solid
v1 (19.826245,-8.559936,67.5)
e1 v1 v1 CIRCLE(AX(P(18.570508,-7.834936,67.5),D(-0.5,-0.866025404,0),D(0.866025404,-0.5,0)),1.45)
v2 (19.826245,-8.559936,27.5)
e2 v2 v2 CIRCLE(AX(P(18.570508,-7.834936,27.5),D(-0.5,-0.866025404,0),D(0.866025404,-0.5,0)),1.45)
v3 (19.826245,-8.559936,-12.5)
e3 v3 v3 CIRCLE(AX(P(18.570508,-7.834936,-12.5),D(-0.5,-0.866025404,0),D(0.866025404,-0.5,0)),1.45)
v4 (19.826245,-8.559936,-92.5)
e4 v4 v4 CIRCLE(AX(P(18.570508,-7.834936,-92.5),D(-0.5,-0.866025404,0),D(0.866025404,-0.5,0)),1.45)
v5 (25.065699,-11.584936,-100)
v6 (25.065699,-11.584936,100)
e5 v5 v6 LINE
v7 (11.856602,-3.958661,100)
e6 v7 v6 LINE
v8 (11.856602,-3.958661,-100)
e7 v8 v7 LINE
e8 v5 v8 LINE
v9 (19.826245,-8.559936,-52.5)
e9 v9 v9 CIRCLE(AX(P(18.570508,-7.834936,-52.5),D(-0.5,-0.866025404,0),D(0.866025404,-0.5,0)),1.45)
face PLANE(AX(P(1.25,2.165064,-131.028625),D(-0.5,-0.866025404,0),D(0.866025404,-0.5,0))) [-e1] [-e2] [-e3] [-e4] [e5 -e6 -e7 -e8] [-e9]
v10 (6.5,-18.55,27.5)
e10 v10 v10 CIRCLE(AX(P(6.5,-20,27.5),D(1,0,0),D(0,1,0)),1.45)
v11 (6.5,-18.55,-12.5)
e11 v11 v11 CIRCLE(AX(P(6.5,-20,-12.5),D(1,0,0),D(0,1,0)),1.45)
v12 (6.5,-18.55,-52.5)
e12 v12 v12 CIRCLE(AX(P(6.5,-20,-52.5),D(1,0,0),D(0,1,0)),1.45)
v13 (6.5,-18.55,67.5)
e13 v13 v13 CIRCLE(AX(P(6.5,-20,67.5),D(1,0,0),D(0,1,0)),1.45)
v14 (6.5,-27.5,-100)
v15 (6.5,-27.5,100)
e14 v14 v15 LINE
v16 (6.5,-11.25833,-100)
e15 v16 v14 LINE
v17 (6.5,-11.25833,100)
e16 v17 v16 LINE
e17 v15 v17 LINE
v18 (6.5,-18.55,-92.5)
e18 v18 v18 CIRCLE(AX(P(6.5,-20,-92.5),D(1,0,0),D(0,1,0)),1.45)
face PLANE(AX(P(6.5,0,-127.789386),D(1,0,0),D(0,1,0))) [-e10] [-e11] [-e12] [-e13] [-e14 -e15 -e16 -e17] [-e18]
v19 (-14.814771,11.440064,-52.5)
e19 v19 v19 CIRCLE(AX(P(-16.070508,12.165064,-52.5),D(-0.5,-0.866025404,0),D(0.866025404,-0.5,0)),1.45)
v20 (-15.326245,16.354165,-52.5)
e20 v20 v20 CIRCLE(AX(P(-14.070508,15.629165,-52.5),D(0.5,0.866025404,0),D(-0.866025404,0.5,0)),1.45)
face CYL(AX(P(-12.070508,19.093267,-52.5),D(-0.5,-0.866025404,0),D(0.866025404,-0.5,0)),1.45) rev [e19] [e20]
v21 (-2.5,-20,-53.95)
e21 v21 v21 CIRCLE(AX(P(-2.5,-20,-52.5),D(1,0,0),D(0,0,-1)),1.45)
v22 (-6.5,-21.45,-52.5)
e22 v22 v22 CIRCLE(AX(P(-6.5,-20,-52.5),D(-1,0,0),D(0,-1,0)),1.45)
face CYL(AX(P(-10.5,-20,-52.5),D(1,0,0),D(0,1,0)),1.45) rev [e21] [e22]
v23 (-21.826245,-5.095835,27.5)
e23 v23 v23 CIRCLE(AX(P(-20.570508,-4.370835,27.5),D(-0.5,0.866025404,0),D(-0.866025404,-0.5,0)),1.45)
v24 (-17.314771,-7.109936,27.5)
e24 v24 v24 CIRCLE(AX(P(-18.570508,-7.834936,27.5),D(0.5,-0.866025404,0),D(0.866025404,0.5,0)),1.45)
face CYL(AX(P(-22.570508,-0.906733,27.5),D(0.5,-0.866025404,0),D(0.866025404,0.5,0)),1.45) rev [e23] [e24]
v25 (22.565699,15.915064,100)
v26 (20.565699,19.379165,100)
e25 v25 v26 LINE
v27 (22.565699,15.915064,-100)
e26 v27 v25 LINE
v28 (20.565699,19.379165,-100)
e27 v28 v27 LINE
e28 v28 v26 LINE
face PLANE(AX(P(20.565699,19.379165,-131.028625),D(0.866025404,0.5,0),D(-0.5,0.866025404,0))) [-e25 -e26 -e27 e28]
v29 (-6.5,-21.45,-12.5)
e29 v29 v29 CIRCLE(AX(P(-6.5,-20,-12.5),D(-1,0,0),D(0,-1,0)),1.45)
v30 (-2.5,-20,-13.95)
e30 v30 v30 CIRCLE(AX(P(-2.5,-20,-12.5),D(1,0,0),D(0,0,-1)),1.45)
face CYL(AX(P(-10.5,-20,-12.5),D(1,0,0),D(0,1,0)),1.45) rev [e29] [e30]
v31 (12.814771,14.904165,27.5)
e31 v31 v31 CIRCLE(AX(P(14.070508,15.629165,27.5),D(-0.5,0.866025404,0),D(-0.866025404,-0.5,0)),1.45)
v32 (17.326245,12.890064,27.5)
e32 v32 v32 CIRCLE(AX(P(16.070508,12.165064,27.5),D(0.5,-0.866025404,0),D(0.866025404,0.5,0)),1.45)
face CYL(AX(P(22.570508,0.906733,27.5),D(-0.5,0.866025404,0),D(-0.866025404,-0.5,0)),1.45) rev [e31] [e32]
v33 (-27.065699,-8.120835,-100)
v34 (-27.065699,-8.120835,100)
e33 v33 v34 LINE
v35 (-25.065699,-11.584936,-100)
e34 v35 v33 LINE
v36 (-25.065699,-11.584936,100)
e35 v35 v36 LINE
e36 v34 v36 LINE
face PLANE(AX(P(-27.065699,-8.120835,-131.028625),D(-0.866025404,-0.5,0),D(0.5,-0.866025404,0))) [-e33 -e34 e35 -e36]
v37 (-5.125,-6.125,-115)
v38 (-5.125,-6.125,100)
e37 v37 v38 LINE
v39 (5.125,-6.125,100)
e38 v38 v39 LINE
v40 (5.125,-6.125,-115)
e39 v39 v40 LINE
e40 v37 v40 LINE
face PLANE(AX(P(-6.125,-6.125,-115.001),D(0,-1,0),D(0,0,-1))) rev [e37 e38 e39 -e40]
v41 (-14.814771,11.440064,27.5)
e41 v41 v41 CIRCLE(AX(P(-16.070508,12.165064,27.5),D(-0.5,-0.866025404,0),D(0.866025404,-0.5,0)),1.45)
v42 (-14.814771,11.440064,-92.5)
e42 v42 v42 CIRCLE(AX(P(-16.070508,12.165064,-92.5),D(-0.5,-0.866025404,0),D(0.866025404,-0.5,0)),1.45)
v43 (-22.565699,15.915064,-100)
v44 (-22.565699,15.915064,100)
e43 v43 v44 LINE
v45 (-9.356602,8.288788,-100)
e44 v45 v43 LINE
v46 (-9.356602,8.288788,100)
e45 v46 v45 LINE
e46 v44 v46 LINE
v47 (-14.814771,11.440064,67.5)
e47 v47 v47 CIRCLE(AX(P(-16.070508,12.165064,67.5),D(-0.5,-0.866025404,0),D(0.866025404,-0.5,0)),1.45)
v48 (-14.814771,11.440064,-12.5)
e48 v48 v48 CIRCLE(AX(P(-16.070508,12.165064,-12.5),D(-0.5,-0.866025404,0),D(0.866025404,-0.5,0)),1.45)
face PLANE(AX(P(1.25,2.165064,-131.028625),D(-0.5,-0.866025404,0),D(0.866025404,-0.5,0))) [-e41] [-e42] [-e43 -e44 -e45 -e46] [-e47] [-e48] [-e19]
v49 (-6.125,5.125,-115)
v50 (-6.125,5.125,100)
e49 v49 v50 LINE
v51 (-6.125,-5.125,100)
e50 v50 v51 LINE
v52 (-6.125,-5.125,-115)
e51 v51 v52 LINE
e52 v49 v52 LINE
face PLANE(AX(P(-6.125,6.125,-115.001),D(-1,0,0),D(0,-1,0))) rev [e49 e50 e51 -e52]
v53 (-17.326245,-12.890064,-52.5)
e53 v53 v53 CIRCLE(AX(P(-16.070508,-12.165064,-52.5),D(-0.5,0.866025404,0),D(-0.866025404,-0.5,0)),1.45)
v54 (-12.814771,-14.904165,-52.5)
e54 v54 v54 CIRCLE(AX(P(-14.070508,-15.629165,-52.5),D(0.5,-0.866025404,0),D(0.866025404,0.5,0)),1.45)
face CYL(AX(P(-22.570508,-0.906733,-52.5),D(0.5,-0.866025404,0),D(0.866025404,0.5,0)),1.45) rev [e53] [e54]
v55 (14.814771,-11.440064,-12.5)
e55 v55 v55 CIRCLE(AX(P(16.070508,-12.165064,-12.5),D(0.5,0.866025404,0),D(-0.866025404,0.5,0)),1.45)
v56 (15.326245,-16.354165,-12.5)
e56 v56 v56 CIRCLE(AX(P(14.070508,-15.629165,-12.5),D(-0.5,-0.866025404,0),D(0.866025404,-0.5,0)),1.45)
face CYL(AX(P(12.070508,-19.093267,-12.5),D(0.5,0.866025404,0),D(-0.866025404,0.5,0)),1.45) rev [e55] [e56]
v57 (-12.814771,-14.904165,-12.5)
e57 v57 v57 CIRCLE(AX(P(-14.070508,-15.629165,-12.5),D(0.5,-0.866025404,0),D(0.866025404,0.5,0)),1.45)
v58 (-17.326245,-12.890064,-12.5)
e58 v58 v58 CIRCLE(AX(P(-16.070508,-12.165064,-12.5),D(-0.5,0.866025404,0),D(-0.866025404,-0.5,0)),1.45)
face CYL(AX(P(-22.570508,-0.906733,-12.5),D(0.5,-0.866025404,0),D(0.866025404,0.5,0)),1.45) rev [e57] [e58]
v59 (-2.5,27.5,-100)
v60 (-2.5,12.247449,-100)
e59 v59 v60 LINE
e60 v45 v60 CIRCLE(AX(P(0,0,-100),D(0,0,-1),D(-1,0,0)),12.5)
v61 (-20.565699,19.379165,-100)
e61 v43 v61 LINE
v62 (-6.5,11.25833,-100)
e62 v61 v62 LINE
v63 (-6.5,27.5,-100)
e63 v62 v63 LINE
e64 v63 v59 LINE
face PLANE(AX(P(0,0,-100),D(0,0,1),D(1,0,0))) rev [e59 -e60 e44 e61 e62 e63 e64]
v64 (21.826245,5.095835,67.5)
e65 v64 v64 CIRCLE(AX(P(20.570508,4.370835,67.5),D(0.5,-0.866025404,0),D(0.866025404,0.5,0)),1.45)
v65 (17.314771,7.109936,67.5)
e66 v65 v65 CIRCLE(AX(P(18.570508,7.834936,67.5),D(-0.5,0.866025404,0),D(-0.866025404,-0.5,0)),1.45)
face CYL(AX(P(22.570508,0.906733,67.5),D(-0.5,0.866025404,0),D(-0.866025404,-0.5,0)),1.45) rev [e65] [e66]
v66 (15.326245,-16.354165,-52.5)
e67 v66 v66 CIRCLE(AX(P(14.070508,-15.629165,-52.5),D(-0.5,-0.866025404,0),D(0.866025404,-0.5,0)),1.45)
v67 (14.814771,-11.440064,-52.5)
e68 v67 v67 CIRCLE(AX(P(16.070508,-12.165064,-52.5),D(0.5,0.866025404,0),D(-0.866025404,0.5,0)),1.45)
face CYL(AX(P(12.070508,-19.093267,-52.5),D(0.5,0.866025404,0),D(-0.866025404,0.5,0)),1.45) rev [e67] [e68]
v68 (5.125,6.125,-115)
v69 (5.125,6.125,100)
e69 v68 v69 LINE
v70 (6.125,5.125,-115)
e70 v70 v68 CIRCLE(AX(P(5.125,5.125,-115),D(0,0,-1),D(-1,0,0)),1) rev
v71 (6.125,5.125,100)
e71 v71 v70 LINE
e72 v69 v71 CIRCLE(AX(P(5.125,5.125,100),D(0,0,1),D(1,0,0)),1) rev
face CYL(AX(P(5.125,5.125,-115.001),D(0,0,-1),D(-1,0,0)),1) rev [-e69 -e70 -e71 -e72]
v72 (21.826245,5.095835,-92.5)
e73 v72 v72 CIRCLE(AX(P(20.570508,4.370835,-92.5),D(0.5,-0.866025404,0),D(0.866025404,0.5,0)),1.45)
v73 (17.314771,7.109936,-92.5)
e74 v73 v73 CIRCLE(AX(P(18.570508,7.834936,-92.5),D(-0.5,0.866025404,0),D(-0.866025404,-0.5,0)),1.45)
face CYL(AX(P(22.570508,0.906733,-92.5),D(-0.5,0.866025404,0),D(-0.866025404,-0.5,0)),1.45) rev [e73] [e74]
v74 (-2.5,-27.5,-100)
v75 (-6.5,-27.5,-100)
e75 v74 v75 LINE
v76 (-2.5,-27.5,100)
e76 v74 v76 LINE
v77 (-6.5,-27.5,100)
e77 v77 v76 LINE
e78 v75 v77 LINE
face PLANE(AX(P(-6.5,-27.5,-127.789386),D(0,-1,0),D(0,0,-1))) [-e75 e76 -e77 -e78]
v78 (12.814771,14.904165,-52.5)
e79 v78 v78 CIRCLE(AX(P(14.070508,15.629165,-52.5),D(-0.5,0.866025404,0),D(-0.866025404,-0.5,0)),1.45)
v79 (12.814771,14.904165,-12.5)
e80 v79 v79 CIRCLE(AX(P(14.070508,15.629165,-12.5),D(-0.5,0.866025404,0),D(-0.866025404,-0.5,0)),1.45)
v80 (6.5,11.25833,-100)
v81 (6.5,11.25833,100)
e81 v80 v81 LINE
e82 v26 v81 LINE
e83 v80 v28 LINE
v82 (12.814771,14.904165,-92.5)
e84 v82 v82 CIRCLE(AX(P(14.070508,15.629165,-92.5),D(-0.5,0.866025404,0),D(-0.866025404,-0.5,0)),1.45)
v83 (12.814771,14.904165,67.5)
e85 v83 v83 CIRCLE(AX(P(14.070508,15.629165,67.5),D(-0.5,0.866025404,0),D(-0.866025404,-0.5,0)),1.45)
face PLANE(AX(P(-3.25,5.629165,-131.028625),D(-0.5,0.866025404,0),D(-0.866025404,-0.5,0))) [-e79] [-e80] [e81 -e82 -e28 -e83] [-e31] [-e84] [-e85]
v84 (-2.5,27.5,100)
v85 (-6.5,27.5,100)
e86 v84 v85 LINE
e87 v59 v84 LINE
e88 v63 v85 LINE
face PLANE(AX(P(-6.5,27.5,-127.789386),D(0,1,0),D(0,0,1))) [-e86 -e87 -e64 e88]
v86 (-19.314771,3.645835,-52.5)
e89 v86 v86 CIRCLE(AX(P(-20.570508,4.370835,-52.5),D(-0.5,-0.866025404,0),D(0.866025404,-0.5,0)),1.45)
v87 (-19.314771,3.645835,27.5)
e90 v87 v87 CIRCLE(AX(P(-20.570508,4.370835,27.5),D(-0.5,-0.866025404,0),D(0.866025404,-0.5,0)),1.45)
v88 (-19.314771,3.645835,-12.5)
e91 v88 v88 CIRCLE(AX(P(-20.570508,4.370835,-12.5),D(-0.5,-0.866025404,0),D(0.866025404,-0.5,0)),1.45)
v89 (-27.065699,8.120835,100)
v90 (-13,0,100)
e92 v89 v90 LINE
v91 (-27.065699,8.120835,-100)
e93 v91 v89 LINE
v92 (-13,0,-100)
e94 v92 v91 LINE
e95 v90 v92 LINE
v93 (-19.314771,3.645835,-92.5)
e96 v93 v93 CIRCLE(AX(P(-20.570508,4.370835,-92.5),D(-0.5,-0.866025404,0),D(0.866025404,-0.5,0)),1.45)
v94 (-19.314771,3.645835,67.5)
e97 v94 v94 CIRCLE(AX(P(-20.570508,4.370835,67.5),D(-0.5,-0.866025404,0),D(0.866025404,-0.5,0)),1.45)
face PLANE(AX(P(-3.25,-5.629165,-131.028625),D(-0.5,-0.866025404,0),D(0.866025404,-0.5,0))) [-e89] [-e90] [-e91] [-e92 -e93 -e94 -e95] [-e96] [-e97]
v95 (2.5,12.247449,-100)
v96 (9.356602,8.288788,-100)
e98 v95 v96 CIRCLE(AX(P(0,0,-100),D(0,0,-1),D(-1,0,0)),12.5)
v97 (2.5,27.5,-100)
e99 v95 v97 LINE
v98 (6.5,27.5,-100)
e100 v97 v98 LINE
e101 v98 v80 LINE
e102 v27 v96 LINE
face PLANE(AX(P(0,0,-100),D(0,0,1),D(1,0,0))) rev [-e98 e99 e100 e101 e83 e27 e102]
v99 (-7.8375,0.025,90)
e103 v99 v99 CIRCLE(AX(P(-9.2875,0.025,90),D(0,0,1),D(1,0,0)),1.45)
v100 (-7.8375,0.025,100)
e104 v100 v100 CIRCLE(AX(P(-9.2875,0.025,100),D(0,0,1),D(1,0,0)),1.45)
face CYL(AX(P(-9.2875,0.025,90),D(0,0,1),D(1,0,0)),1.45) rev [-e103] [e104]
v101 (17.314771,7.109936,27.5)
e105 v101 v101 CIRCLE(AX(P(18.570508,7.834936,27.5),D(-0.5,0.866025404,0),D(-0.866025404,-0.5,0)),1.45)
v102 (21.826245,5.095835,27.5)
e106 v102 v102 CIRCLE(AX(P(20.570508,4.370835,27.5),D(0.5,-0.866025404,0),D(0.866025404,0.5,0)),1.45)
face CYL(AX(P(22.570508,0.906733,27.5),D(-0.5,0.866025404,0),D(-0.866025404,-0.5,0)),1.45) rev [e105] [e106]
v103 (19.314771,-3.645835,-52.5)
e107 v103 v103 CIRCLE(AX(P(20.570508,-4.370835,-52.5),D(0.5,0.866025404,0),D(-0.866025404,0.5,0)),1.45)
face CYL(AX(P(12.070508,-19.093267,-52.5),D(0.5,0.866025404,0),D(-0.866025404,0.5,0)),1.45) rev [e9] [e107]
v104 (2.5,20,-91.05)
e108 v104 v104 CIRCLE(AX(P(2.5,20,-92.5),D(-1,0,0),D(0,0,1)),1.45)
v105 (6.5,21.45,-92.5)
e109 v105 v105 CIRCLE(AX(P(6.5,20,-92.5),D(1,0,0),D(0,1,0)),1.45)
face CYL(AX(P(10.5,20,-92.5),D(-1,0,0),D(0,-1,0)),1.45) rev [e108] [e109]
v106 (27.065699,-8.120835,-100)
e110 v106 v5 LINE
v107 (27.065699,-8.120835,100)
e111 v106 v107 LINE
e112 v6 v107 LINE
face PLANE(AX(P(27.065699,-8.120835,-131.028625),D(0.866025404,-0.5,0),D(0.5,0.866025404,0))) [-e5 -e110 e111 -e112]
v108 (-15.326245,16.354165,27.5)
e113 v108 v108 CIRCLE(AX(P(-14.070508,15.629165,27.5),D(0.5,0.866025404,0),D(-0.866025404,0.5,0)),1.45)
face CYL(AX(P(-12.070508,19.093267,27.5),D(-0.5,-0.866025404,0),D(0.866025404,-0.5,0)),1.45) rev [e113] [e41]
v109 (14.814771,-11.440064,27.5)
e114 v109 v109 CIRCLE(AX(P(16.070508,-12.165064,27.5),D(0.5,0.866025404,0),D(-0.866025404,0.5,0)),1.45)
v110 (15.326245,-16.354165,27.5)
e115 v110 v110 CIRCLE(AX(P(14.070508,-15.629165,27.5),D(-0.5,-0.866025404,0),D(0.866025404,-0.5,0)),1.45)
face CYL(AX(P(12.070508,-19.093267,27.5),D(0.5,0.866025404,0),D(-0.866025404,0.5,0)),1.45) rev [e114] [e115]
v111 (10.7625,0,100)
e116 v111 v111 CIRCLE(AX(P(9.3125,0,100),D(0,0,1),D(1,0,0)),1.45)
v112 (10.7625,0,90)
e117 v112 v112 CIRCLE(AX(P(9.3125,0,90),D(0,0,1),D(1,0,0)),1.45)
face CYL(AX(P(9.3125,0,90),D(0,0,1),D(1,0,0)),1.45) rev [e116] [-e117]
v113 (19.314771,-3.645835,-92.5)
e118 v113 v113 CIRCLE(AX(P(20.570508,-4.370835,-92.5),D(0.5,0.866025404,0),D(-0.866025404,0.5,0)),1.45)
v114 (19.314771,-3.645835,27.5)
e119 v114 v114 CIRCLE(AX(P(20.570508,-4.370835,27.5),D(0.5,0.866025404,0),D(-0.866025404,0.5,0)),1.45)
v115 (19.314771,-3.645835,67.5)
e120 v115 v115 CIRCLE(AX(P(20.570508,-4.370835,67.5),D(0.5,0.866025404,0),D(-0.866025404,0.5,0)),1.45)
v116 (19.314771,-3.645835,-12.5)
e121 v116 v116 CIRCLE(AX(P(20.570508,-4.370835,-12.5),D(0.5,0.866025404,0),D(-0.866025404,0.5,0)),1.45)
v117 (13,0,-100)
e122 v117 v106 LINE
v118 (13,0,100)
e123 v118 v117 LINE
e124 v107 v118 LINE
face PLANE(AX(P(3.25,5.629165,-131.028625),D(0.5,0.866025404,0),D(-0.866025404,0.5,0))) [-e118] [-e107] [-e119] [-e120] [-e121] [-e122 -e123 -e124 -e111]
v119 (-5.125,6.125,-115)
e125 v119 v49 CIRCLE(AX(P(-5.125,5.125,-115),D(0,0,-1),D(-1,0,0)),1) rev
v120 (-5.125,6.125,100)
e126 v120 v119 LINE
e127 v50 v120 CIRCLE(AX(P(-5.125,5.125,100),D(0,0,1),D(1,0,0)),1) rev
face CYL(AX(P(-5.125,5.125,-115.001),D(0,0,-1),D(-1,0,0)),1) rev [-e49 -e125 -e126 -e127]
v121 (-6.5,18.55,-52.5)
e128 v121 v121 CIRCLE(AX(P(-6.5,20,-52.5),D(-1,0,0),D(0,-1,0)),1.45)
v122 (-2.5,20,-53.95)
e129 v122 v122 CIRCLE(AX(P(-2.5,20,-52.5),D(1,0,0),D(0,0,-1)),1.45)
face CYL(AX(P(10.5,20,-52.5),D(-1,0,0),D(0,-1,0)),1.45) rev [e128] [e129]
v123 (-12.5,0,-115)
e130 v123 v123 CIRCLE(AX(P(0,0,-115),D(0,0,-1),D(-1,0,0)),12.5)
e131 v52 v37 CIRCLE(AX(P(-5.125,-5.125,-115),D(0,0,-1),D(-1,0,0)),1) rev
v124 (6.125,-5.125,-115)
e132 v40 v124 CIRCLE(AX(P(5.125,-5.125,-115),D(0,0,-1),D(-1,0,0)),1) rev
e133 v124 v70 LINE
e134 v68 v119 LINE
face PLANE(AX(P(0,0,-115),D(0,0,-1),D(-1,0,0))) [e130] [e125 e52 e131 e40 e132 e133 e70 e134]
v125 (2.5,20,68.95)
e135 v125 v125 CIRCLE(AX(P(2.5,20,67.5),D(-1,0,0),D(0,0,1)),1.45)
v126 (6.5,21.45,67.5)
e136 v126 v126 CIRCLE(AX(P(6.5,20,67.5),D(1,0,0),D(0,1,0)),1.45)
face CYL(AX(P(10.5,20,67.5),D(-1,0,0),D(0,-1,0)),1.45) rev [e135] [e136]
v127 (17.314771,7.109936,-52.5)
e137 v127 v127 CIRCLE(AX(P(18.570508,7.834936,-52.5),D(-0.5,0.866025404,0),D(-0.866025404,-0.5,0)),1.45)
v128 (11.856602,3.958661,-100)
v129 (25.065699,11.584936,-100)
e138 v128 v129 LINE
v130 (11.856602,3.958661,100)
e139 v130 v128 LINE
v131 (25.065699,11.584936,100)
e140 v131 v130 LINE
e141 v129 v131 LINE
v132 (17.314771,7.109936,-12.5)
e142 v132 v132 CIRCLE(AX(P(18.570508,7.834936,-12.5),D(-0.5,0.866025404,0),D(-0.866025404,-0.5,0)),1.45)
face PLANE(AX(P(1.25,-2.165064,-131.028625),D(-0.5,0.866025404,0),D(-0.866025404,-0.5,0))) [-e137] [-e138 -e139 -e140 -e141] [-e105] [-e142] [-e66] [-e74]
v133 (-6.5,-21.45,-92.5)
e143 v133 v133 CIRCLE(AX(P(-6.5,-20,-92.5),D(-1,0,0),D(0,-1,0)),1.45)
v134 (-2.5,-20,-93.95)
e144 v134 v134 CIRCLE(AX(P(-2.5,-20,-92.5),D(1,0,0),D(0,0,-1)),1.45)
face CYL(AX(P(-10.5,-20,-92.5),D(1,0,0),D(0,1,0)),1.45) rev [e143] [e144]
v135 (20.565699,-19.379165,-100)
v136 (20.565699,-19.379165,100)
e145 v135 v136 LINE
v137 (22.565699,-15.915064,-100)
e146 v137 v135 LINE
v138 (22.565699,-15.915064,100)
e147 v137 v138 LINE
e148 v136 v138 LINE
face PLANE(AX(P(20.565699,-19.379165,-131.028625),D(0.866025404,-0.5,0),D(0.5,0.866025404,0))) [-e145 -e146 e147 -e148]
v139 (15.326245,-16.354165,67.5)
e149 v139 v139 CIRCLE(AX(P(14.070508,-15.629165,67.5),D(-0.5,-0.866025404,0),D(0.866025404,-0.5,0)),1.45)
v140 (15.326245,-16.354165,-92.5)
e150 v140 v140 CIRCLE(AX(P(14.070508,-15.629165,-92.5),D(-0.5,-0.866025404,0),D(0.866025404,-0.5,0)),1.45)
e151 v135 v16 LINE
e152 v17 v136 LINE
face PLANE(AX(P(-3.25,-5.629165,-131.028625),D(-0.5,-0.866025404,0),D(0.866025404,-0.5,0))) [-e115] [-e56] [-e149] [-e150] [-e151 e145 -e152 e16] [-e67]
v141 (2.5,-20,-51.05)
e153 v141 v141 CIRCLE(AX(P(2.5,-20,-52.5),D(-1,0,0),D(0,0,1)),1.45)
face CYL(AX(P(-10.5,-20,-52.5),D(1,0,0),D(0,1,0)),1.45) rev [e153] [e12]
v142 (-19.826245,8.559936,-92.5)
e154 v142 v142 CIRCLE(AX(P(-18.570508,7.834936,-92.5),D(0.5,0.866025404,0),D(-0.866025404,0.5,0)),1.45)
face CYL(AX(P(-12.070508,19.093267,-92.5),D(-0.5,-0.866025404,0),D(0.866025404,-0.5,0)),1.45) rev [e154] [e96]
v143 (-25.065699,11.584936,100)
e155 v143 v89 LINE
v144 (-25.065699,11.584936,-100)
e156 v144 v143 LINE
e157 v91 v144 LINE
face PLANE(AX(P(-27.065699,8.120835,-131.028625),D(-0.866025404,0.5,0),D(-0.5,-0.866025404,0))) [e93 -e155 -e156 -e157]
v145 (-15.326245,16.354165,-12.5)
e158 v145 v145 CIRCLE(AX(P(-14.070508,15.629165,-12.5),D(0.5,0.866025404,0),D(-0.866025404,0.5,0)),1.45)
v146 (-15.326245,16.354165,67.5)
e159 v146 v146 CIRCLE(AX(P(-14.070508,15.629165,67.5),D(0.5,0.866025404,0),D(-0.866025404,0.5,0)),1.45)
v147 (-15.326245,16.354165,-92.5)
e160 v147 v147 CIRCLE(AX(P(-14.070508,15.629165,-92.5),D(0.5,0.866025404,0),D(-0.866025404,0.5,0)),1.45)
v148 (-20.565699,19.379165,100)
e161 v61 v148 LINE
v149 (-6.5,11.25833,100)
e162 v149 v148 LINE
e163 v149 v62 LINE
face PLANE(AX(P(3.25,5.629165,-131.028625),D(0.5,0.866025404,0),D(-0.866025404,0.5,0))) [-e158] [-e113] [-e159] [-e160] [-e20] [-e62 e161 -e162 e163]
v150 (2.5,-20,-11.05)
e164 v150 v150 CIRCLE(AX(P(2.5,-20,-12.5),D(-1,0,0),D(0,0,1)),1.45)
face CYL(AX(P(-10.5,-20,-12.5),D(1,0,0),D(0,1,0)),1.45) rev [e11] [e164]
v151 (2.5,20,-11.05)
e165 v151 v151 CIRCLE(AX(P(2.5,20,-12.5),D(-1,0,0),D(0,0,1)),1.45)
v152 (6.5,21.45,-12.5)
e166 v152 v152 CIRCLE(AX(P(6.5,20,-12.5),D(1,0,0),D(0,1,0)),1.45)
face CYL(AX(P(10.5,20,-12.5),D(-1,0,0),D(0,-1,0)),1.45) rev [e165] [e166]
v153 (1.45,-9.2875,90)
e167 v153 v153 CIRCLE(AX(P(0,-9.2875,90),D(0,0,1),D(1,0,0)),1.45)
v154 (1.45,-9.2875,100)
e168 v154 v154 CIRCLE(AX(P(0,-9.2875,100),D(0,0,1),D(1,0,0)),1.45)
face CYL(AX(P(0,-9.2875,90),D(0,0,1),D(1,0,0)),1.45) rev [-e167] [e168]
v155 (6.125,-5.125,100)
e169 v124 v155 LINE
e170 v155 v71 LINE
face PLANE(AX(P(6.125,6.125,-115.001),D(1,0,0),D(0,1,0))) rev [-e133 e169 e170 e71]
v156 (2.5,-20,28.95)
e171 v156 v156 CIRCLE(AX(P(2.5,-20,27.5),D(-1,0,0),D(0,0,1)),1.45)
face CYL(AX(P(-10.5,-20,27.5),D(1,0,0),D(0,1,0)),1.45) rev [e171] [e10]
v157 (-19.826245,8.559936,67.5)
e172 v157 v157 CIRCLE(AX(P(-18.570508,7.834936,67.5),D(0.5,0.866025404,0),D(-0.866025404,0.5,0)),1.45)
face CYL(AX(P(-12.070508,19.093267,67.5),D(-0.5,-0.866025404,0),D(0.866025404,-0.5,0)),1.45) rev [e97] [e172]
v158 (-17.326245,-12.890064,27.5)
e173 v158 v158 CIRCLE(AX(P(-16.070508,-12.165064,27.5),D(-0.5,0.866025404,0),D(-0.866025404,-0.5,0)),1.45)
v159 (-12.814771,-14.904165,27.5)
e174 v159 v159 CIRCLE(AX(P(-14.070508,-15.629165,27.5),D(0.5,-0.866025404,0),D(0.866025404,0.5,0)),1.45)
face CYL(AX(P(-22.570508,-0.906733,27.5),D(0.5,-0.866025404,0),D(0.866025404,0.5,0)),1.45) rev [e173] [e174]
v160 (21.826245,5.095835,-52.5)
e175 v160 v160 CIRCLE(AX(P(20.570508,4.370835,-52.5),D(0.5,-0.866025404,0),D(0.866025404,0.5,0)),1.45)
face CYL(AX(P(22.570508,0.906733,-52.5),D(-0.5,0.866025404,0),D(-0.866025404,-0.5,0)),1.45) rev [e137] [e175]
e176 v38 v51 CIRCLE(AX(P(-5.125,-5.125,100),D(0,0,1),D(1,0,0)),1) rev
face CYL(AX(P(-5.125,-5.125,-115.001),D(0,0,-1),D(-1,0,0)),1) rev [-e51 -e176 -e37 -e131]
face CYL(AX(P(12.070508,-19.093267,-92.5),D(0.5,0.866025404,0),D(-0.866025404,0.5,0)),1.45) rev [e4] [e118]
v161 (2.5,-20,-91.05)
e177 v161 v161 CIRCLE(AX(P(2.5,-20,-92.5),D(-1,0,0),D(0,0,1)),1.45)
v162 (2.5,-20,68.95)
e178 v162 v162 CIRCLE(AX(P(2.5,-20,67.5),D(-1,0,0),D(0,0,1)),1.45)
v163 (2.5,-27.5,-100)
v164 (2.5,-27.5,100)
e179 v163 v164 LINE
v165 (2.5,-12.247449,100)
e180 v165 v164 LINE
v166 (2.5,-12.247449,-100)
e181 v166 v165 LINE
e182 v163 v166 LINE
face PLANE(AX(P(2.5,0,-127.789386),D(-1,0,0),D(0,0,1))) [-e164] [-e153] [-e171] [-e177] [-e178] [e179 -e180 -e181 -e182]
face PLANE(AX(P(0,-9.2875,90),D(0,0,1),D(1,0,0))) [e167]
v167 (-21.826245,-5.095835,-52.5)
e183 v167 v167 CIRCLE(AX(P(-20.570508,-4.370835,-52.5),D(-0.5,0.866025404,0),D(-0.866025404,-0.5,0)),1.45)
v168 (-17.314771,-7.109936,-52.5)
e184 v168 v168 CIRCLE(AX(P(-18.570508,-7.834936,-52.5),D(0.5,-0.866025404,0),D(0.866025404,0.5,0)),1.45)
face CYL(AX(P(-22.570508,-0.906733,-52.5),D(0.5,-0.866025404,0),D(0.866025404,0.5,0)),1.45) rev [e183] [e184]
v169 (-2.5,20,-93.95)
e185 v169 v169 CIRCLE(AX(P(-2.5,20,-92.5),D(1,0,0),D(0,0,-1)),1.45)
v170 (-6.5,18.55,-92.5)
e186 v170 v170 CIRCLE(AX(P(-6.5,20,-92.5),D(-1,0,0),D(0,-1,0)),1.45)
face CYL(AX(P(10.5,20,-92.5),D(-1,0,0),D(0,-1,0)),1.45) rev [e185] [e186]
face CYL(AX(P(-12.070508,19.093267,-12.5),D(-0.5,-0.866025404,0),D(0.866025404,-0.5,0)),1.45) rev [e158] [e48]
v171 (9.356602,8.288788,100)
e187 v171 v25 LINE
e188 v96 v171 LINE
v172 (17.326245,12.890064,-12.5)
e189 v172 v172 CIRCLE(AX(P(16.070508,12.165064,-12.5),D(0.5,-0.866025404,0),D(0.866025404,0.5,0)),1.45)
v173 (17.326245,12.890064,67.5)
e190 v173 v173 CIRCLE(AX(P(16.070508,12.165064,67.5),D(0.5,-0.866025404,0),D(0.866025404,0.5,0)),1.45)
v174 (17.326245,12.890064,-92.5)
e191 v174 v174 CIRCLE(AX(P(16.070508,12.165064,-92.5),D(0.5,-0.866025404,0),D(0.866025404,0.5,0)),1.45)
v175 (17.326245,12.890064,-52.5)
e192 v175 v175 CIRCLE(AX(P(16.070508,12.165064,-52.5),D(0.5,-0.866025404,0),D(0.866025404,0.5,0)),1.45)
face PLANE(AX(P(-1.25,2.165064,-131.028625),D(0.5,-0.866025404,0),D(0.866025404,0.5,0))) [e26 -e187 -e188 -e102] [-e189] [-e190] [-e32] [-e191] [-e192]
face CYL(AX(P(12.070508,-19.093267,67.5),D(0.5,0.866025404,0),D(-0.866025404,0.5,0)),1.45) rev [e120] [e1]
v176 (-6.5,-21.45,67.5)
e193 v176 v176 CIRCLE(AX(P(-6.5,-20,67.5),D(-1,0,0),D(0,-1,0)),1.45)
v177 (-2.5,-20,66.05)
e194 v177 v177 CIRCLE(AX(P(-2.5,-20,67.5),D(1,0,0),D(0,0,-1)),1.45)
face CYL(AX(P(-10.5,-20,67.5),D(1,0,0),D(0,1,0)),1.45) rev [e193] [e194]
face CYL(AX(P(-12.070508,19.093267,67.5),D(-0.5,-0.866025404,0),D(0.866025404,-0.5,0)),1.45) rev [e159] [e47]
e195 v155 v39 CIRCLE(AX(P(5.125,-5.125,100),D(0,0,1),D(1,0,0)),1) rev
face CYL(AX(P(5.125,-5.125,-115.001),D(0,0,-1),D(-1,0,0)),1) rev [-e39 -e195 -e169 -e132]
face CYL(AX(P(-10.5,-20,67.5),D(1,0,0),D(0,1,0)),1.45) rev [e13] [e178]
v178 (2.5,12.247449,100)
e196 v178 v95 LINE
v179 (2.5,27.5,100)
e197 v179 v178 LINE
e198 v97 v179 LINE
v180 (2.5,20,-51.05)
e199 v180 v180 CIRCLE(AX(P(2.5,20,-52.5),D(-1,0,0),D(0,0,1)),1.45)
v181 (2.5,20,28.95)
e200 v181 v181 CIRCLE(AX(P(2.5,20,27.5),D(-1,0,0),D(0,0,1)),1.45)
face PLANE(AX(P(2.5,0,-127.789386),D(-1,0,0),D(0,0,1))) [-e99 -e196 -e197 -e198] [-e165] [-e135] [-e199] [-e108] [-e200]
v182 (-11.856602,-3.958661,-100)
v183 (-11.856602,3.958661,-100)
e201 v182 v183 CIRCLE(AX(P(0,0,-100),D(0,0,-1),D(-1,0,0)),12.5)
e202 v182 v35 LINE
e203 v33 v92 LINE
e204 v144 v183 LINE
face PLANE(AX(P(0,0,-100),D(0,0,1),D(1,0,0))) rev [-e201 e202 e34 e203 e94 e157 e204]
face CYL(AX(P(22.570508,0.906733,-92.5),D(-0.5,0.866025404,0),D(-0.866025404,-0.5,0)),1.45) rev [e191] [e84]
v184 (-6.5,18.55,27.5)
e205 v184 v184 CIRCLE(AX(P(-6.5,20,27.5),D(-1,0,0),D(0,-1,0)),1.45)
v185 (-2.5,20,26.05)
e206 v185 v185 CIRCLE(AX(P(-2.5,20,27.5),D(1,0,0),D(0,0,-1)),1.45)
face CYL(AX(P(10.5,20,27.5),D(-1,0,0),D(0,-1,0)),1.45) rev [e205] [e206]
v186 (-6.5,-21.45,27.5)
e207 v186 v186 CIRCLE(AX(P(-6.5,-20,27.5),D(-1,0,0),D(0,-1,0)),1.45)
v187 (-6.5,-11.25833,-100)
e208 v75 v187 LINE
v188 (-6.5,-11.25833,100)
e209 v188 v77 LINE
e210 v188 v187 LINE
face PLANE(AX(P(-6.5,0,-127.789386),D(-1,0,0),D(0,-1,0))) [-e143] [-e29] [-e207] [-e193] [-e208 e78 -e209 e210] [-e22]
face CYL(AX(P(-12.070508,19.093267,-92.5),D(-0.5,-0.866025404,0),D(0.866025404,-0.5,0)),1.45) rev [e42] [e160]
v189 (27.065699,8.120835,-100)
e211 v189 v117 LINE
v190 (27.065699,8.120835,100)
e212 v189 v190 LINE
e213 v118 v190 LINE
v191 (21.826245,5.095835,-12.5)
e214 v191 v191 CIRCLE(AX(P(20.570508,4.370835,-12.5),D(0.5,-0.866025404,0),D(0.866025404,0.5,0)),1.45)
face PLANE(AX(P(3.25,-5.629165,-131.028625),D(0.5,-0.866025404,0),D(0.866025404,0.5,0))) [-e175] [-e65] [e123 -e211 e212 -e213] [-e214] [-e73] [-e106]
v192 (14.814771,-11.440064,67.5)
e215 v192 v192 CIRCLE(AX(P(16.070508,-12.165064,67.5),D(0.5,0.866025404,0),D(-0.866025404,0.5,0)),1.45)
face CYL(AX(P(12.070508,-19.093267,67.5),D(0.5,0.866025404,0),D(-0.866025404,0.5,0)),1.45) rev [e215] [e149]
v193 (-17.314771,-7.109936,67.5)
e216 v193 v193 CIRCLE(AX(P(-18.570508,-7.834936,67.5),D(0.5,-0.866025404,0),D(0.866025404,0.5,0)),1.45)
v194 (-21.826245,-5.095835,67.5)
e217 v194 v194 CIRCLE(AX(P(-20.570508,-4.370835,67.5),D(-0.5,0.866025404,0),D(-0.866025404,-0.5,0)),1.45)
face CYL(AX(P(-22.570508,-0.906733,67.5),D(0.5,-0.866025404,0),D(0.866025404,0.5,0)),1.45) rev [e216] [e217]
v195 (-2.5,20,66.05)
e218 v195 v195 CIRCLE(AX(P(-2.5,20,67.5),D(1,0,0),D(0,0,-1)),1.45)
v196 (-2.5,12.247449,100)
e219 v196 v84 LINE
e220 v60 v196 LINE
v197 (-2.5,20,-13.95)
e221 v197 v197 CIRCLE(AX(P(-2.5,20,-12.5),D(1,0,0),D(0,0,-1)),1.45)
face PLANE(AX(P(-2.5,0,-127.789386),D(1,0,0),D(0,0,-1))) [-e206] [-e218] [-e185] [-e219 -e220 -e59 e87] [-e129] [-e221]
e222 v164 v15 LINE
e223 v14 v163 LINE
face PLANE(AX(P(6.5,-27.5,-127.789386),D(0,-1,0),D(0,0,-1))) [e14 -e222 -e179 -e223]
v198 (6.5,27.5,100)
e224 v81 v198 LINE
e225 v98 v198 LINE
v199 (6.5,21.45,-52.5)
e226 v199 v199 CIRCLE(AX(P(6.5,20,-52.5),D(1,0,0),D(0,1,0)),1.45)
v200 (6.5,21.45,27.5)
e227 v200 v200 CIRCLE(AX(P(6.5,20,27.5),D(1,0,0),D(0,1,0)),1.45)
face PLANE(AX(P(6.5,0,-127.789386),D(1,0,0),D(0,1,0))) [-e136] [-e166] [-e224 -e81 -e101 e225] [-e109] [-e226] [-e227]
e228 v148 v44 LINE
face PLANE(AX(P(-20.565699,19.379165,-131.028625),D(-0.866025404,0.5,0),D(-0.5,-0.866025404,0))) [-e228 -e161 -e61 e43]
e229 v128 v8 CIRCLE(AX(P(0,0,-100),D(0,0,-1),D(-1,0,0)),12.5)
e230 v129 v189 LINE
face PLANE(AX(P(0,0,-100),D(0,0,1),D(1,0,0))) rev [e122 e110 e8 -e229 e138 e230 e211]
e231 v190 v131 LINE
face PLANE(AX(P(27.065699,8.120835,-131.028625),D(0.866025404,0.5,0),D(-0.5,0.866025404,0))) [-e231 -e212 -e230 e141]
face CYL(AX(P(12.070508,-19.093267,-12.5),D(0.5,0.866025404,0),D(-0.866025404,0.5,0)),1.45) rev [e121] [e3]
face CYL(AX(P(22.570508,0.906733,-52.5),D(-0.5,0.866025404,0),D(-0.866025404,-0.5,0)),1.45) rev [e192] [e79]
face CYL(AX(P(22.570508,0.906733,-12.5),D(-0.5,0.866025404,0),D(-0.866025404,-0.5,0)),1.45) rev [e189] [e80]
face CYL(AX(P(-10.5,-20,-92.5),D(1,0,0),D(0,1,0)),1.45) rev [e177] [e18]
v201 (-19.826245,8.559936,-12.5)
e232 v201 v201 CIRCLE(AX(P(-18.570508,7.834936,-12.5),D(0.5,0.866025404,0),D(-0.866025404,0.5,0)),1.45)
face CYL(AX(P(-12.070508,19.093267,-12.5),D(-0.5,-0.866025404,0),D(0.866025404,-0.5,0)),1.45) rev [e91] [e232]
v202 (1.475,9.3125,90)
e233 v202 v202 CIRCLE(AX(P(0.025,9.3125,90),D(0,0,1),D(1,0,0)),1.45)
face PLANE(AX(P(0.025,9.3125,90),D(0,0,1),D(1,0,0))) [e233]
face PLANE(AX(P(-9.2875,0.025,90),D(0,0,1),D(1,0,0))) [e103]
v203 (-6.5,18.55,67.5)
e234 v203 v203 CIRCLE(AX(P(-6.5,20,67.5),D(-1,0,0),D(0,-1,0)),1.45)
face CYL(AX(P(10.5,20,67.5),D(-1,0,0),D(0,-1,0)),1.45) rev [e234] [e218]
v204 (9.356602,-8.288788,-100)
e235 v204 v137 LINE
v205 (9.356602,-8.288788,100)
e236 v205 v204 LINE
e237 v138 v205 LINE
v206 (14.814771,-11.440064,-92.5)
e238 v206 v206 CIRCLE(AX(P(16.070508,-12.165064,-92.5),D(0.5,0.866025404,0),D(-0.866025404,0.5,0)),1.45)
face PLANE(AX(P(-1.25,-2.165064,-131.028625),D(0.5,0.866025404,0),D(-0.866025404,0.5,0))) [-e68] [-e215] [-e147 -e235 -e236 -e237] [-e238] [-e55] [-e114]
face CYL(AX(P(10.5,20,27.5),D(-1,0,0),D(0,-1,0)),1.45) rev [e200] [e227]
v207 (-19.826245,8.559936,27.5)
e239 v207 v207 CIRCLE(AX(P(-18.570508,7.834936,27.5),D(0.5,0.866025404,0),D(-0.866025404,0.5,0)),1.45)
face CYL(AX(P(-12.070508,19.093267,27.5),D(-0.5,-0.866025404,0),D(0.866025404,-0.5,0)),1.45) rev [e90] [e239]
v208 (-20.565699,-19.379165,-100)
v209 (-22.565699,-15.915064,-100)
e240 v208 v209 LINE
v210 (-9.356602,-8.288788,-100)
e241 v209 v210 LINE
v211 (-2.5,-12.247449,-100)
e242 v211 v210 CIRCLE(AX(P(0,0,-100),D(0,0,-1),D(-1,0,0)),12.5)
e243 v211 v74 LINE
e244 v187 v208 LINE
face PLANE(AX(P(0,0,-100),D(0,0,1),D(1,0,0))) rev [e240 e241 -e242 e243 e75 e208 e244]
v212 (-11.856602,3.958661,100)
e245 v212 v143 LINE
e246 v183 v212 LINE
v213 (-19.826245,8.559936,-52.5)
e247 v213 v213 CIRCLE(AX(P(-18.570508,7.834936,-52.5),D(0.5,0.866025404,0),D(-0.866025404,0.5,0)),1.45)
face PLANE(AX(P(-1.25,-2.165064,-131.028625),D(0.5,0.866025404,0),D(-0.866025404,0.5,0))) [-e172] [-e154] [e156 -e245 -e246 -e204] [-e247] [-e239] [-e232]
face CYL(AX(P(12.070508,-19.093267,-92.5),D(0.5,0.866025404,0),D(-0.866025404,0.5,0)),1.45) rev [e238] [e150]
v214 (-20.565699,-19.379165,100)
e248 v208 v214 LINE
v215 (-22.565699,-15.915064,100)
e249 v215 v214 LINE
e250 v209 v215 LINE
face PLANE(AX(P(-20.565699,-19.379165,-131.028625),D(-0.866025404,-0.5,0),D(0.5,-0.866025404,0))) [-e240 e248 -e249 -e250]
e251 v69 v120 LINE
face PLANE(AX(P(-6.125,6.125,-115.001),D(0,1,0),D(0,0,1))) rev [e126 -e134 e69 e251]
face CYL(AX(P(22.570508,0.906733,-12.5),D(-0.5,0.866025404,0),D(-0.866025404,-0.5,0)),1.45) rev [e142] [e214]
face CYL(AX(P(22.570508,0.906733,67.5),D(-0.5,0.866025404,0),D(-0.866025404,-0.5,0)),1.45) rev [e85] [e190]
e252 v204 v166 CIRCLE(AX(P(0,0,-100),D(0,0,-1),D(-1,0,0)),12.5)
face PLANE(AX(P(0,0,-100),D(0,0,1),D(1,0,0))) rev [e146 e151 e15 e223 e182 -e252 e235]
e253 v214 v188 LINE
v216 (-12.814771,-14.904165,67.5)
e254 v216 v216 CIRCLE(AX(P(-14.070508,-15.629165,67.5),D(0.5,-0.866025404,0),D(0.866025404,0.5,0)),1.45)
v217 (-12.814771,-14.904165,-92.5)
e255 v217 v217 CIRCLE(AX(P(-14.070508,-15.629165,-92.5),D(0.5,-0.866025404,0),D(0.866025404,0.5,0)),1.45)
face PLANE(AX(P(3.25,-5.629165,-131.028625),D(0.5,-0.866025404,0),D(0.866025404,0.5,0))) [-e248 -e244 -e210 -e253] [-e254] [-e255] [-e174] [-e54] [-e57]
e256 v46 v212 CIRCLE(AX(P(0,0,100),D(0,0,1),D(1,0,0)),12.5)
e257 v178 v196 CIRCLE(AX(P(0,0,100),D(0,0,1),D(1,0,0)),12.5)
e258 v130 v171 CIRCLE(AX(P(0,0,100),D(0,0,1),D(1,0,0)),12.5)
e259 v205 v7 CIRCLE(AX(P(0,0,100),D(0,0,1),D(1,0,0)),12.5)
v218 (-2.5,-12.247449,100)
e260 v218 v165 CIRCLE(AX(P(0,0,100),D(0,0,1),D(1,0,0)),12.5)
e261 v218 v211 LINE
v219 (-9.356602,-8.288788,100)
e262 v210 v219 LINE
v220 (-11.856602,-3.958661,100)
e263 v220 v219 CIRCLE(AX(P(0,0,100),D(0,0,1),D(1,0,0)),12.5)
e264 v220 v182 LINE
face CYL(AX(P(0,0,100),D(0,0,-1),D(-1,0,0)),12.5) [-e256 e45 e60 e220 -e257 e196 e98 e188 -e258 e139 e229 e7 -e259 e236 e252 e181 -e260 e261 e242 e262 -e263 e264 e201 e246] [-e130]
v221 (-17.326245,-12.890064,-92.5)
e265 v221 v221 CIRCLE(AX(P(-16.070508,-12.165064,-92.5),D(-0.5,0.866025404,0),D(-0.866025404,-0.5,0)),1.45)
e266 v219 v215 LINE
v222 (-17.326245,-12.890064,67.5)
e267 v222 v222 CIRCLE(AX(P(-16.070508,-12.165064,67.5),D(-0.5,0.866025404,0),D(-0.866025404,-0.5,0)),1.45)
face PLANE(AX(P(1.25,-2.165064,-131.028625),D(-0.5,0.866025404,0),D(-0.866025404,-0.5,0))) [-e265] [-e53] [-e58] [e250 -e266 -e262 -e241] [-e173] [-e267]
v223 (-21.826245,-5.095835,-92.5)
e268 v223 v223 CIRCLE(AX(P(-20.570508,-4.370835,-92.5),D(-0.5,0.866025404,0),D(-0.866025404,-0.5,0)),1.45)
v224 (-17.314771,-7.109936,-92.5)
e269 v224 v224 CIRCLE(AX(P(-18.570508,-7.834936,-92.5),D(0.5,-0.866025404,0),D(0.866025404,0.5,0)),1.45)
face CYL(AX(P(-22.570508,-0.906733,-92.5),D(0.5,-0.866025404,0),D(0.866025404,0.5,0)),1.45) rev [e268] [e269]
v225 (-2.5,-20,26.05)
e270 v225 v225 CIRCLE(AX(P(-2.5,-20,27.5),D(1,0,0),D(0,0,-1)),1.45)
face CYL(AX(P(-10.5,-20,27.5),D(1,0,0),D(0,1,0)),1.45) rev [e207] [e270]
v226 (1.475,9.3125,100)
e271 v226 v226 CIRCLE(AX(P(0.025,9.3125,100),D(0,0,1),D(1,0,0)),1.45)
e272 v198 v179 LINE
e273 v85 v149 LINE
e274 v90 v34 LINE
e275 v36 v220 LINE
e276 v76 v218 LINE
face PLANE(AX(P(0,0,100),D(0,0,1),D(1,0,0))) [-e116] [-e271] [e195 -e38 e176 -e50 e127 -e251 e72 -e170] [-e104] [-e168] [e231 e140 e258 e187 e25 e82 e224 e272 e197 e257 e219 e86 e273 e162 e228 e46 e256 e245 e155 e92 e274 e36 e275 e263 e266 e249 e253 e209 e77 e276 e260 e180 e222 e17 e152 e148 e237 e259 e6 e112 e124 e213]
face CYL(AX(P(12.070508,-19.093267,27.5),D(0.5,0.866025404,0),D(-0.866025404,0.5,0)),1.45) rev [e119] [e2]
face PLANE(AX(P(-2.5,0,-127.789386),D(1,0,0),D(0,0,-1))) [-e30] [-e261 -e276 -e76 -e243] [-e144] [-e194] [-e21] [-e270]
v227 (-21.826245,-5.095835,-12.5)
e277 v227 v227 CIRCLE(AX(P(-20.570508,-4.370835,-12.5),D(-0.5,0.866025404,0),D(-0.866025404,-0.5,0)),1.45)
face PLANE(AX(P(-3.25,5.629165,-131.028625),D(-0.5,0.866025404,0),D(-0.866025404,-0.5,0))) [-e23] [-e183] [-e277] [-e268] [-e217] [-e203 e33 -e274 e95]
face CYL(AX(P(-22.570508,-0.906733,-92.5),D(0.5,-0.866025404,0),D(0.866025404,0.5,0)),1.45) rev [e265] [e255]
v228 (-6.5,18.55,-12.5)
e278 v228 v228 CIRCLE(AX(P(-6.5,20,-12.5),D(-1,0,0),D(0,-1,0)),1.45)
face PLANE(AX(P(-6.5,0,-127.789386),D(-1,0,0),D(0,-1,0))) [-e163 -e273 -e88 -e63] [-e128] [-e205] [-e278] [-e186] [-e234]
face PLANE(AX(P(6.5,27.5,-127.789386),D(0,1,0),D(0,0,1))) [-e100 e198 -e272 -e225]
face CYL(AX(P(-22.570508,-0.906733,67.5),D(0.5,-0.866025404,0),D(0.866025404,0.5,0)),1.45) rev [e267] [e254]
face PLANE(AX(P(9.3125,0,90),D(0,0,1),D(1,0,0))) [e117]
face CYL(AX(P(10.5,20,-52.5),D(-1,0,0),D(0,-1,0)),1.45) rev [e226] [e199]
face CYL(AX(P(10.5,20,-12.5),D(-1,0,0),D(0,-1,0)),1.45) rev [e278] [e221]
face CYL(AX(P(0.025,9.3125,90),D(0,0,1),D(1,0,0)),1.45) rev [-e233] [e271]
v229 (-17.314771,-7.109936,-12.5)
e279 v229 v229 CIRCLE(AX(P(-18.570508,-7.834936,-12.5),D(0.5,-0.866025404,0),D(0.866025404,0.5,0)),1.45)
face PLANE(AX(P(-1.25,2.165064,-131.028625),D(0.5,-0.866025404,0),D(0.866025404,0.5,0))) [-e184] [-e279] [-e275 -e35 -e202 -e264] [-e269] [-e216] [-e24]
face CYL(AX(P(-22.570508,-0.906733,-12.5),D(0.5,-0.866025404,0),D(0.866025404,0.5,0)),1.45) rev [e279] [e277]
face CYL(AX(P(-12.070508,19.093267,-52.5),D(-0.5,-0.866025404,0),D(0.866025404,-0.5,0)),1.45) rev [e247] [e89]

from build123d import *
from build123d.topology import SkipClean

# Parameters (mm, degrees)
SKETCH1_R           = 12.5
BOSS_EXTRUDE1_DEPTH = 100
SKETCH4_W           = 4
SKETCH4_H           = 27.5
BOSS_EXTRUDE3_DEPTH = 200
CIRPATTERN7_COUNT   = 6
SKETCH7_R           = 1.45
CUT_EXTRUDE2_DEPTH  = 17
CIRPATTERN9_COUNT   = 6
SKETCH10_R          = 12.5
BOSS_EXTRUDE4_DEPTH = 15
CUT_EXTRUDE3_REACH  = 220.435
SKETCH8_W           = 12.25
SKETCH8_H           = 12.25
SKETCH9_R           = 1.45
CUT_EXTRUDE4_DEPTH  = 10
FILLET1_R           = 1


with BuildPart() as part:
    # Sketch1 → Boss-Extrude1 (new, symmetric)
    with BuildSketch(Plane.XY):
        Circle(SKETCH1_R)
    extrude(amount=BOSS_EXTRUDE1_DEPTH, both=True)

    # Sketch4 → Boss-Extrude3 (add)
    with BuildSketch(Plane.XY.offset(100)):
        with Locations((-4.5, 13.75)):
            Rectangle(SKETCH4_W, SKETCH4_H)
        with Locations((4.5, 13.75)):
            Rectangle(SKETCH4_W, SKETCH4_H)
    boss_extrude3 = extrude(amount=-BOSS_EXTRUDE3_DEPTH)

    # CirPattern7: Boss-Extrude3 ×6 about axis
    cirpattern7_axis = Axis((0, 0, 0), (0, 0, 1))
    for i in range(1, CIRPATTERN7_COUNT):
        add(boss_extrude3.rotate(cirpattern7_axis, i * 360 / CIRPATTERN7_COUNT))

    # Sketch7 → Cut-Extrude2 (cut)
    with BuildSketch(Plane.ZY.offset(6.5)):
        with Locations((-92.5, 20)):
            Circle(SKETCH7_R)
        with Locations((-52.5, 20)):
            Circle(SKETCH7_R)
        with Locations((-12.5, 20)):
            Circle(SKETCH7_R)
        with Locations((27.5, 20)):
            Circle(SKETCH7_R)
        with Locations((67.5, 20)):
            Circle(SKETCH7_R)
    cut_extrude2 = extrude(amount=-CUT_EXTRUDE2_DEPTH, mode=Mode.SUBTRACT)

    # CirPattern9: Cut-Extrude2 ×6 about axis
    cirpattern9_axis = Axis((0, 0, 100), (0, 0, 1))
    for i in range(1, CIRPATTERN9_COUNT):
        add(cut_extrude2.rotate(cirpattern9_axis, i * 360 / CIRPATTERN9_COUNT), mode=Mode.SUBTRACT)

    # Sketch10 → Boss-Extrude4 (add)
    with SkipClean():  # the faces are left unmerged after this step: merging them gives an invalid solid
        with BuildSketch(Plane(origin=(0, 0, -100), x_dir=(-1, 0, 0), z_dir=(0, 0, -1))):
            Circle(SKETCH10_R)
        extrude(amount=BOSS_EXTRUDE4_DEPTH)
    add(part.part.scale(1), mode=Mode.REPLACE)  # the faces are merged on a copy

    # Sketch8 → Cut-Extrude3 (cut, up to next)
    with BuildSketch(Plane.XY.offset(100), mode=Mode.PRIVATE) as cut_extrude3_sk1:
        Rectangle(SKETCH8_W, SKETCH8_H)
    cut_extrude3_tool1 = extrude(cut_extrude3_sk1.sketch, amount=-CUT_EXTRUDE3_REACH, mode=Mode.PRIVATE) & part.part
    add(cut_extrude3_tool1.solids().sort_by_distance((0, 0, 100))[0], mode=Mode.SUBTRACT)

    # Sketch9 → Cut-Extrude4 (cut)
    with BuildSketch(Plane.XY.offset(100)):
        with Locations((9.3125, 0)):
            Circle(SKETCH9_R)
        with Locations((0, -9.2875)):
            Circle(SKETCH9_R)
        with Locations((-9.2875, 0.025)):
            Circle(SKETCH9_R)
        with Locations((0.025, 9.3125)):
            Circle(SKETCH9_R)
    extrude(amount=-CUT_EXTRUDE4_DEPTH, mode=Mode.SUBTRACT)

    # Fillet1
    fillet1_edges = [part.edges().sort_by_distance(p)[0] for p in [
        (6.125, 6.125, -7.5),
        (6.125, -6.125, -7.5),
        (-6.125, -6.125, -7.5),
        (-6.125, 6.125, -7.5),
    ]]
    fillet(fillet1_edges, radius=FILLET1_R)


solid = part.part
